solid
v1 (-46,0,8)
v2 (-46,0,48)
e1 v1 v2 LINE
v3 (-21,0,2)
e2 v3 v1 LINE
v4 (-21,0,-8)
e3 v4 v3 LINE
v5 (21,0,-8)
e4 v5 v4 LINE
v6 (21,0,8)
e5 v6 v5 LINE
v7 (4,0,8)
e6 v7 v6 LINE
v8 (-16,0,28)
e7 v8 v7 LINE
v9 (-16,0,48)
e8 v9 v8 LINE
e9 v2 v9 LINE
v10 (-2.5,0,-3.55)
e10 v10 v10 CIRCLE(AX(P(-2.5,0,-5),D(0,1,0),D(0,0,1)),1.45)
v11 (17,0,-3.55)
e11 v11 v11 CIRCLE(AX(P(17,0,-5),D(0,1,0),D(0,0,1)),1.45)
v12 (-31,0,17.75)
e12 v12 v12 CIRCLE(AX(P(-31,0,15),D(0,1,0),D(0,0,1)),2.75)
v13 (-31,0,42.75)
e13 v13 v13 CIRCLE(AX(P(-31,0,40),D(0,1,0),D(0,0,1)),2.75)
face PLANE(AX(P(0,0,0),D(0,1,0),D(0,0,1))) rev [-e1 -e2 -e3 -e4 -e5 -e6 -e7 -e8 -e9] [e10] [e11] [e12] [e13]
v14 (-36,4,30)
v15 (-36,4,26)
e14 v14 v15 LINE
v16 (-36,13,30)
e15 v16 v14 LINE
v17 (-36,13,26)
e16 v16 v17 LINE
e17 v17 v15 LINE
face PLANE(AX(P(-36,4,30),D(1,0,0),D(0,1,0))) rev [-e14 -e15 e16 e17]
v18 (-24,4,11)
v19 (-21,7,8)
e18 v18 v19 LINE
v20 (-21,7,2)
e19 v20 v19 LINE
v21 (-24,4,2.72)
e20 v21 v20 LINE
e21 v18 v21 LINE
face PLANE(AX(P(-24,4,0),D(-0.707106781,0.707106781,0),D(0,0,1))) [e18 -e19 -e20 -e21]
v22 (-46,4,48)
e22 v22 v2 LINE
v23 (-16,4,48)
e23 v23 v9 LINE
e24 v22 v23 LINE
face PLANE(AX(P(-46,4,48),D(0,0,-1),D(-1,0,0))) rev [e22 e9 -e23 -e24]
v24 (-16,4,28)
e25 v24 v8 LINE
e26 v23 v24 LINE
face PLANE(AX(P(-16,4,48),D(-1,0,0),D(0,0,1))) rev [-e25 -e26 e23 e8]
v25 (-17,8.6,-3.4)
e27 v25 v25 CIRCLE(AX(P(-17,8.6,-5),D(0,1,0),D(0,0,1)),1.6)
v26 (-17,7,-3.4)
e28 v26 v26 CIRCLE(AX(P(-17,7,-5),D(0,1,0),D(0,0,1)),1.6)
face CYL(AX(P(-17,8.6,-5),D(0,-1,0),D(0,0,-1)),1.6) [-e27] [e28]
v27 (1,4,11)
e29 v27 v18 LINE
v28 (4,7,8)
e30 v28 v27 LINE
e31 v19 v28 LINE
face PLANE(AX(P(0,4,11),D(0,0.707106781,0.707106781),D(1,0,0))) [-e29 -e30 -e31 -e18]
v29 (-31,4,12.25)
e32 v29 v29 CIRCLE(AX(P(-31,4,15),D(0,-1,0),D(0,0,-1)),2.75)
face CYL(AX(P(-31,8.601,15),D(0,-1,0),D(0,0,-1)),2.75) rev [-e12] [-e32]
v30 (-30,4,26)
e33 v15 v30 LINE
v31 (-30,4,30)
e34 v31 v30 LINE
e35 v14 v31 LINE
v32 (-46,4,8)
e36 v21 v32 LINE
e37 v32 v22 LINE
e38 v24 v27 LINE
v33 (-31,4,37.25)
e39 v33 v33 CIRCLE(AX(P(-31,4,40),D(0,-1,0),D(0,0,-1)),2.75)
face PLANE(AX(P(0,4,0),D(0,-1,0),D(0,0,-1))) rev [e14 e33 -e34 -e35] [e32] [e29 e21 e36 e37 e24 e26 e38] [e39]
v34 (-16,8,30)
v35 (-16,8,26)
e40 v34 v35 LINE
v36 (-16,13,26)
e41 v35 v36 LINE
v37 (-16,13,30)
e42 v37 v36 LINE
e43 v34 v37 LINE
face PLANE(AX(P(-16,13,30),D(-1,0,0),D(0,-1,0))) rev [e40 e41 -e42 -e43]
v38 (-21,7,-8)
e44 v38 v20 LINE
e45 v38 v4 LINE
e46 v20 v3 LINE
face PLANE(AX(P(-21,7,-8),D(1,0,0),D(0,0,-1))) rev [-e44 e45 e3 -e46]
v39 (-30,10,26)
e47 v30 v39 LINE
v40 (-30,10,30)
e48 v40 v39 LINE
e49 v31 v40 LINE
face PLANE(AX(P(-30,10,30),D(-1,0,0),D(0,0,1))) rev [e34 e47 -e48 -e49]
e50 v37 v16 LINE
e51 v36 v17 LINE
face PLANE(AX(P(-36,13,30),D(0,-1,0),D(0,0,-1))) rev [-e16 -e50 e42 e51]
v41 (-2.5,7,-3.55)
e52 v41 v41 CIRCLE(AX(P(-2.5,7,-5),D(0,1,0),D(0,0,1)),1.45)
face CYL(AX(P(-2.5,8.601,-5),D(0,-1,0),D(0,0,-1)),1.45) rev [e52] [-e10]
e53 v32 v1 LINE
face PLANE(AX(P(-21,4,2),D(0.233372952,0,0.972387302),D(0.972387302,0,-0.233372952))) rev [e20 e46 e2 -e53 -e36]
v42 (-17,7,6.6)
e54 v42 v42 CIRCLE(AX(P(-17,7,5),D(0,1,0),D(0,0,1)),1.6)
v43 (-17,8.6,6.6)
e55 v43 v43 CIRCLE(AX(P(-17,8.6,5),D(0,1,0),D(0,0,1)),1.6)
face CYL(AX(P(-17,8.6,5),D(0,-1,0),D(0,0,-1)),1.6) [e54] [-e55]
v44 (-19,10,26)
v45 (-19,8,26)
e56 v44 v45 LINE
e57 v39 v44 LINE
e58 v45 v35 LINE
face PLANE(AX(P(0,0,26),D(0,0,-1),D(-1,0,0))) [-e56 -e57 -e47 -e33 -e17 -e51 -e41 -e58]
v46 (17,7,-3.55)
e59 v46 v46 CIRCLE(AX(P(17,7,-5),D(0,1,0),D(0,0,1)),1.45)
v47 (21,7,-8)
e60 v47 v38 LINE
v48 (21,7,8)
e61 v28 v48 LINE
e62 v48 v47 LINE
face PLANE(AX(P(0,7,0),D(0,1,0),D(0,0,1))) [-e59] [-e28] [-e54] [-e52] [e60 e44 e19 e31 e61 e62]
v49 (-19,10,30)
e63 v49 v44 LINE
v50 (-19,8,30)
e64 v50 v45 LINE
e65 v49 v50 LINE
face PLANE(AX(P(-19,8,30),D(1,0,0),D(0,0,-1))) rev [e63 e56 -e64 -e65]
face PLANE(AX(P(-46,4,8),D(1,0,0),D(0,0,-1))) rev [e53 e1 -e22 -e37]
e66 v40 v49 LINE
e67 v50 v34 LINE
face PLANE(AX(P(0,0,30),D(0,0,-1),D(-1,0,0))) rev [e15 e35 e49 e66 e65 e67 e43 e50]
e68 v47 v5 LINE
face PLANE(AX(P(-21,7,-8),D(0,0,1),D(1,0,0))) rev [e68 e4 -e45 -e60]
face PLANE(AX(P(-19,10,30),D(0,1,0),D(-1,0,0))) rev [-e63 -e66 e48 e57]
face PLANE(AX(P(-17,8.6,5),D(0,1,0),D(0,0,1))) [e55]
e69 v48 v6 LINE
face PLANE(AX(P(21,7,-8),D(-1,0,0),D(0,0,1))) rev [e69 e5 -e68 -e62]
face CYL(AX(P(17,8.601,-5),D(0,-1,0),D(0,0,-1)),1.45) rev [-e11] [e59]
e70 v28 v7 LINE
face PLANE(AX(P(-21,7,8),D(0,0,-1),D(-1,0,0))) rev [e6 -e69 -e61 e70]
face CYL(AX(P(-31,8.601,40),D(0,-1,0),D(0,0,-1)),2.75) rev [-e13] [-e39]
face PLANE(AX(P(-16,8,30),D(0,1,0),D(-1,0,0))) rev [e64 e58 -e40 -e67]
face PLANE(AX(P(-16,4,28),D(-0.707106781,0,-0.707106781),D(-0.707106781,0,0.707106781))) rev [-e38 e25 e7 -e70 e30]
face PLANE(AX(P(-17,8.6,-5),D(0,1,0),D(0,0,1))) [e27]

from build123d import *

# Parameters (mm, degrees)
SKETCH1_W           = 42
SKETCH1_H           = 16
BOSS_EXTRUDE1_DEPTH = 7
SKETCH2_R           = 1.6
BOSS_EXTRUDE2_DEPTH = 1.6
CUT_EXTRUDE1_REACH  = 26.062
SKETCH3_R           = 1.45
BOSS_EXTRUDE6_DEPTH = 4
CUT_EXTRUDE2_REACH  = 69.037
SKETCH8_R           = 2.75
BOSS_EXTRUDE7_DEPTH = 2
CHAMFER2_SIZE       = 3


with BuildPart() as part:
    # Sketch1 → Boss-Extrude1 (new body)
    with BuildSketch(Plane(origin=(0, 0, 0), x_dir=(1, 0, 0), z_dir=(0, 1, 0))):
        Rectangle(SKETCH1_W, SKETCH1_H)
    extrude(amount=BOSS_EXTRUDE1_DEPTH)

    # Sketch2 → Boss-Extrude2 (add)
    with BuildSketch(Plane(origin=(0, 7, 0), x_dir=(1, 0, 0), z_dir=(0, 1, 0))):
        with Locations(Location((-17, 5, 0), (0, 0, 270))):
            Circle(SKETCH2_R)
        with Locations(Location((-17, -5, 0), (0, 0, 270))):
            Circle(SKETCH2_R)
    extrude(amount=BOSS_EXTRUDE2_DEPTH)

    # Sketch3 → Cut-Extrude1 (cut, up to next)
    with BuildSketch(Plane(origin=(0, 0, 0), x_dir=(1, 0, 0), z_dir=(0, 1, 0)), mode=Mode.PRIVATE) as cut_extrude1_sk1:
        with Locations(Location((-2.5, 5, 0), (0, 0, 270))):
            Circle(SKETCH3_R)
    cut_extrude1_tool1 = extrude(cut_extrude1_sk1.sketch, amount=CUT_EXTRUDE1_REACH, mode=Mode.PRIVATE) & part.part
    # Sketch3 → Cut-Extrude1 (cut, up to next)
    with BuildSketch(Plane(origin=(0, 0, 0), x_dir=(1, 0, 0), z_dir=(0, 1, 0)), mode=Mode.PRIVATE) as cut_extrude1_sk2:
        with Locations(Location((17, 5, 0), (0, 0, 270))):
            Circle(SKETCH3_R)
    cut_extrude1_tool2 = extrude(cut_extrude1_sk2.sketch, amount=CUT_EXTRUDE1_REACH, mode=Mode.PRIVATE) & part.part
    add(cut_extrude1_tool1.solids().sort_by_distance((-2.5, 0, -5))[0], mode=Mode.SUBTRACT)
    add(cut_extrude1_tool2.solids().sort_by_distance((17, 0, -5))[0], mode=Mode.SUBTRACT)

    # Sketch7 → Boss-Extrude6 (add)
    with BuildSketch(Plane(origin=(0, 0, 0), x_dir=(1, 0, 0), z_dir=(0, 1, 0))):
        Polygon((-21, -2), (-46, -8), (-46, -48), (-16, -48), (-16, -28), (4, -8), (-21, -8), align=None)
    extrude(amount=BOSS_EXTRUDE6_DEPTH)

    # Sketch8 → Cut-Extrude2 (cut, up to next)
    with BuildSketch(Plane(origin=(0, 0, 0), x_dir=(1, 0, 0), z_dir=(0, 1, 0)), mode=Mode.PRIVATE) as cut_extrude2_sk1:
        with Locations(Location((-31, -40, 0), (0, 0, 90))):
            Circle(SKETCH8_R)
    cut_extrude2_tool1 = extrude(cut_extrude2_sk1.sketch, amount=CUT_EXTRUDE2_REACH, mode=Mode.PRIVATE) & part.part
    # Sketch8 → Cut-Extrude2 (cut, up to next)
    with BuildSketch(Plane(origin=(0, 0, 0), x_dir=(1, 0, 0), z_dir=(0, 1, 0)), mode=Mode.PRIVATE) as cut_extrude2_sk2:
        with Locations(Location((-31, -15, 0), (0, 0, 90))):
            Circle(SKETCH8_R)
    cut_extrude2_tool2 = extrude(cut_extrude2_sk2.sketch, amount=CUT_EXTRUDE2_REACH, mode=Mode.PRIVATE) & part.part
    add(cut_extrude2_tool1.solids().sort_by_distance((-31, 0, 40))[0], mode=Mode.SUBTRACT)
    add(cut_extrude2_tool2.solids().sort_by_distance((-31, 0, 15))[0], mode=Mode.SUBTRACT)

    # Sketch9 → Boss-Extrude7 (add, symmetric)
    with BuildSketch(Plane.XY.offset(28)):
        Polygon((-36, 4), (-36, 13), (-16, 13), (-16, 8), (-19, 8), (-19, 10), (-30, 10), (-30, 4), align=None)
    extrude(amount=BOSS_EXTRUDE7_DEPTH, both=True)

    # Chamfer2
    chamfer2_edges = [part.edges().sort_by_distance(p)[0] for p in [
        (-21, 4, 5),
        (-8.5, 4, 8),
    ]]
    chamfer(chamfer2_edges, length=CHAMFER2_SIZE - 0.0001)  # a hair under: the kernel refuses the full size


solid = part.part
